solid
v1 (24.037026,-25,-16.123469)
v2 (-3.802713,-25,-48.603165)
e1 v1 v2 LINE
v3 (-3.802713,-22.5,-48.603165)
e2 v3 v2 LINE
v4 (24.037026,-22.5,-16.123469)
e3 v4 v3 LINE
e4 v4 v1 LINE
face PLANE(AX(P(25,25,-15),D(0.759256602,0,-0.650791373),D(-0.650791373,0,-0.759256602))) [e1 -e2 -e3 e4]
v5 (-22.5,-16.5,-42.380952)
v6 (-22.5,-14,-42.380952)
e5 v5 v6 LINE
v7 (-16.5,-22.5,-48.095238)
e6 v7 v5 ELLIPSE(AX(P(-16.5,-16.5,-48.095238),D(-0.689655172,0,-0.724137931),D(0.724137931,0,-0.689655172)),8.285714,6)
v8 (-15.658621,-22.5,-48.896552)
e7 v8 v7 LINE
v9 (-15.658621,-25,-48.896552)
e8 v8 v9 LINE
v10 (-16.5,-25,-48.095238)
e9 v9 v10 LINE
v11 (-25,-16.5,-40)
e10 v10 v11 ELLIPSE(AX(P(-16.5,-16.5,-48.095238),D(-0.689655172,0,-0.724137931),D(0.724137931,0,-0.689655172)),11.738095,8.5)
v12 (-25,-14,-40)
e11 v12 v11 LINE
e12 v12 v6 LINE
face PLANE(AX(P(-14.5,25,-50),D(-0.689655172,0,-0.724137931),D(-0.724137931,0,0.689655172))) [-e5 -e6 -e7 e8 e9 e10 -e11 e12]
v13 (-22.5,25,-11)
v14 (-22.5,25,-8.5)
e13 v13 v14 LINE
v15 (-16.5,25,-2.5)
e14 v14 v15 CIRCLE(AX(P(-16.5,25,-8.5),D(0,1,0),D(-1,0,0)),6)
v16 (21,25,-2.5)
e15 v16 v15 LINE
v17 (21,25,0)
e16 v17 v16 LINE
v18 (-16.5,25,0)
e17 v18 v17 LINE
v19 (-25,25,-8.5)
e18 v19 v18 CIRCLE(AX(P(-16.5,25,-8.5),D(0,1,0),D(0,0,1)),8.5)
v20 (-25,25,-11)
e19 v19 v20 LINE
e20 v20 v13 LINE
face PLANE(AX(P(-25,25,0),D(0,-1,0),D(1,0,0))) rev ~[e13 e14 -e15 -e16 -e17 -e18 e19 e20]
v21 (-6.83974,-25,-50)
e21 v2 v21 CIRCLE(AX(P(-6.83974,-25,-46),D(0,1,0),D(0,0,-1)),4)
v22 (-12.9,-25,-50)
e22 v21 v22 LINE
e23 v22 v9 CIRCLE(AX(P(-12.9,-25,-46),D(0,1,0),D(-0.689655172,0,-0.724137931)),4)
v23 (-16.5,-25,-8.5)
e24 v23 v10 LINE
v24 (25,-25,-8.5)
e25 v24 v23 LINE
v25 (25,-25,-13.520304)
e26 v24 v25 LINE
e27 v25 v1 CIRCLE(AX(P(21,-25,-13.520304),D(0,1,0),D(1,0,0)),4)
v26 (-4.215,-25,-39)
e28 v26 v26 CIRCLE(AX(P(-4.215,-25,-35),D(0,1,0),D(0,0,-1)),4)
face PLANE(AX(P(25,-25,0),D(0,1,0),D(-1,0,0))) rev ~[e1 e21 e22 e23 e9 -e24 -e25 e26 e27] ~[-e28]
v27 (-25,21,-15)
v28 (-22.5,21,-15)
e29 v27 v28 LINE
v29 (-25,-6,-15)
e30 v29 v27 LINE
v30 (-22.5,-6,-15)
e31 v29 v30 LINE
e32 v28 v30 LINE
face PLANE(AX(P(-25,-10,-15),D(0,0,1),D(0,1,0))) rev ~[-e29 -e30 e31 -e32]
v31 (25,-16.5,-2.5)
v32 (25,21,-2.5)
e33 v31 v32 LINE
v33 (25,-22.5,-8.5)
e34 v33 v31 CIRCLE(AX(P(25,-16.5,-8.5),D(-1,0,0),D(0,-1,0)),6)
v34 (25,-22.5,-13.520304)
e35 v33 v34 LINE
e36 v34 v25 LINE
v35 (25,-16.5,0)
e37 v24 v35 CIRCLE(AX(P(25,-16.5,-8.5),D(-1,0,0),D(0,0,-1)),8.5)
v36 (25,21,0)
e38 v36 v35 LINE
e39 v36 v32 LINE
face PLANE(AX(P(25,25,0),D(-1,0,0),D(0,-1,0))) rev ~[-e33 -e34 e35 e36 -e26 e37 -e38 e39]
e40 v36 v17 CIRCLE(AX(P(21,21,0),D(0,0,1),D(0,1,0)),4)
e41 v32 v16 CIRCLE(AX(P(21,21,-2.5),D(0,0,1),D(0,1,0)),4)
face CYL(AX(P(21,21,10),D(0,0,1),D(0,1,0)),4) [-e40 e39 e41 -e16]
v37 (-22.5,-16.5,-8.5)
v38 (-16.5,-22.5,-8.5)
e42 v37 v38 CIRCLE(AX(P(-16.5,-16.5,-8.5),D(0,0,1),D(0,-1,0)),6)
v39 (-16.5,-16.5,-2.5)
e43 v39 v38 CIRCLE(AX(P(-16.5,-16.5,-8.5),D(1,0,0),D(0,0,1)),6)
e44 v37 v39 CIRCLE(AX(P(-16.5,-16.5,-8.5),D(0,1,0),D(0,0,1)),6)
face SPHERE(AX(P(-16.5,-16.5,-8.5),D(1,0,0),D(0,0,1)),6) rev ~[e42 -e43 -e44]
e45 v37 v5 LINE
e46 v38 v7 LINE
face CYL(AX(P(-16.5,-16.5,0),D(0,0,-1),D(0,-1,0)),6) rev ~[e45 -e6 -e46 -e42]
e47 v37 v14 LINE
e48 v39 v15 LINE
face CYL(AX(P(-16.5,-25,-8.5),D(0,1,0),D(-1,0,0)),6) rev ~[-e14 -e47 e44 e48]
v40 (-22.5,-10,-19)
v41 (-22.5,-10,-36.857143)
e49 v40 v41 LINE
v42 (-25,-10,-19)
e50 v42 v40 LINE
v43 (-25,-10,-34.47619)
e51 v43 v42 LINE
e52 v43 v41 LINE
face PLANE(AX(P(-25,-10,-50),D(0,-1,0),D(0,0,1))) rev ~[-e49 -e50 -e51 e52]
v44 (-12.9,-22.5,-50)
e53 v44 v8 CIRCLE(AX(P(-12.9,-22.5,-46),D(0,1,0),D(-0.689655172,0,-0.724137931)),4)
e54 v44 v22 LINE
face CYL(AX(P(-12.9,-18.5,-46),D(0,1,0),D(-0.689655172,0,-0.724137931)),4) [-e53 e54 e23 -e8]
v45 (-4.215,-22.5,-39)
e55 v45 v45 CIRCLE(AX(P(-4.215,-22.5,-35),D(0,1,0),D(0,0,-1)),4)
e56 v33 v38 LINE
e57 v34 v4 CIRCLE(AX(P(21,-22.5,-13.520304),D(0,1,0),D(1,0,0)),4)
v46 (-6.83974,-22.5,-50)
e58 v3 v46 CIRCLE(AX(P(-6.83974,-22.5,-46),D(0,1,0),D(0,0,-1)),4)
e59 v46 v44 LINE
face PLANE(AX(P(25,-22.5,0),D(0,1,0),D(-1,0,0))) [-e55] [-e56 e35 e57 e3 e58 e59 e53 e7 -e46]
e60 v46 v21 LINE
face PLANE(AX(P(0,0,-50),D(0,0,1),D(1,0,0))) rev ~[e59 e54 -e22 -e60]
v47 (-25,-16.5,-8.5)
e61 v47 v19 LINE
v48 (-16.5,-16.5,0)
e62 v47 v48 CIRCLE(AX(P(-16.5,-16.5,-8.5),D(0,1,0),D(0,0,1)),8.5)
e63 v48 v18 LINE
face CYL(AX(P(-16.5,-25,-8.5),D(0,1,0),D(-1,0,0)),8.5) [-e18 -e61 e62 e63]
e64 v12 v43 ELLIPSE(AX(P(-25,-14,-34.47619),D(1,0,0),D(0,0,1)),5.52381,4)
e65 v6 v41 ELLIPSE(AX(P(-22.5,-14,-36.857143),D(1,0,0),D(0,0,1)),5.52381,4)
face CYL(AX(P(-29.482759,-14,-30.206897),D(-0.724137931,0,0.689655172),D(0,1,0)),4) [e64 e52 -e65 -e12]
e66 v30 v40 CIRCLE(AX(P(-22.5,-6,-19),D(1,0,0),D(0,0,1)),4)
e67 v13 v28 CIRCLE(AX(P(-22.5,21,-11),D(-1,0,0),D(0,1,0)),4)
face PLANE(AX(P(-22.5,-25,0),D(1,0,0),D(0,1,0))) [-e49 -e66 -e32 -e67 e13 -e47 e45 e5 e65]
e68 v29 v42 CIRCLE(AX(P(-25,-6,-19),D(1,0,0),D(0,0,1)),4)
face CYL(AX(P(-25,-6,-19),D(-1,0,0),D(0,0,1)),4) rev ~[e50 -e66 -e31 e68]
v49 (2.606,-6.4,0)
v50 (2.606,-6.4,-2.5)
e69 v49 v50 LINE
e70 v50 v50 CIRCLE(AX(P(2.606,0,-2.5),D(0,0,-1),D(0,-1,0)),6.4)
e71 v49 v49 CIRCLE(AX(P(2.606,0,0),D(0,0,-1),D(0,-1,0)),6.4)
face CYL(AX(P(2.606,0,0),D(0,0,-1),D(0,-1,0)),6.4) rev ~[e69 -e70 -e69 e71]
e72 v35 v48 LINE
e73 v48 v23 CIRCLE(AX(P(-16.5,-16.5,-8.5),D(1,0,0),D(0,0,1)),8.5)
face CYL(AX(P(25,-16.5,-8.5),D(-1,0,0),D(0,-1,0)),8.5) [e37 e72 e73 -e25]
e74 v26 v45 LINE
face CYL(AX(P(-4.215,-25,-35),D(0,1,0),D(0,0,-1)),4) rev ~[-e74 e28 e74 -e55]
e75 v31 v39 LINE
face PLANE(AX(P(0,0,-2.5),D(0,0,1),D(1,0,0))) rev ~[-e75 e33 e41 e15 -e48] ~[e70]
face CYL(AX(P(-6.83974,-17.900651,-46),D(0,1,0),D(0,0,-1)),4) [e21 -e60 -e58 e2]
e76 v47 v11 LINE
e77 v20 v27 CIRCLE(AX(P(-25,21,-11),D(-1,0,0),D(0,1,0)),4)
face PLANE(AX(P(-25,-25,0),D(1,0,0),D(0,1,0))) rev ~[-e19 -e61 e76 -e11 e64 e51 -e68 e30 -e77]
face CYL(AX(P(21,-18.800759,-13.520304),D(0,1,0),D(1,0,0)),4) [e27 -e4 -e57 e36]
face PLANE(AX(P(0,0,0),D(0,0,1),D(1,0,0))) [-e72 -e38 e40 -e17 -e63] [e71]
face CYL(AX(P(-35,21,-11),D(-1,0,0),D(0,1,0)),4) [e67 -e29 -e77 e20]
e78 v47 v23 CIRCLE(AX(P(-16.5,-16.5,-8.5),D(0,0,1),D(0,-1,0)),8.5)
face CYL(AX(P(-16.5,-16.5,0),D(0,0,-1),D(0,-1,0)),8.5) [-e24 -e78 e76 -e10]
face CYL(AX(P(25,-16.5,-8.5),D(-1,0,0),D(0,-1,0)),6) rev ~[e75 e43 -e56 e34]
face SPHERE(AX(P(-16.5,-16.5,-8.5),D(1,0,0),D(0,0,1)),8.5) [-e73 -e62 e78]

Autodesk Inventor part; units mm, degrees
ref_plane "YZ Plane" through (0, 0, 0) normal (1, 0, 0) x (0, 1, 0)
ref_plane "XZ Plane" through (0, 0, 0) normal (0, 1, 0) x (-1, 0, 0)
ref_plane "XY Plane" through (0, 0, 0) normal (0, 0, 1) x (1, 0, 0)
sketch "Sketch1" plane through (0, 0, 0) normal (0, 0, 1) x (1, 0, 0)
  line L0 (-25, 25) -> (25, 25)
  line L1 (25, 25) -> (25, -25)
  line L2 (25, -25) -> (-25, -25)
  line L3 (-25, -25) -> (-25, 25)
  point P0 (0, 0)
  dimension "d0" = 50
  dimension "d1" = 50
  dimension "d2" = 25
  dimension "d3" = 25
extrude "Extrusion1" add sketch "Sketch1" against normal blind 50
fillet "Fillet1" radius 8.5 3 edges at (0, -25, 0) (-25, 0, 0) (-25, -25, -25)
shell "Shell1" thickness 2.5 removed faces 3 at (-8.3333, 11.1667, -50) at (-8.3333, 25, -36.1667) at (25, 11.1667, -16.6667)
sketch "Sketch2" plane through (-25, -16.5, -8.5) normal (-1, 0, 0) x (0, 0, 1)
  line L0 (0, 41.5) -> (-41.5, 41.5) projected
  line L1 (-41.5, 41.5) -> (-41.5, 0) projected
  line L2 (-41.5, 6.5) -> (-6.5, 6.5)
  line L3 (-6.5, 6.5) -> (-6.5, 41.5)
  line L4 (-6.5, 41.5) -> (-41.5, 41.5)
  line L5 (-41.5, 41.5) -> (-41.5, 6.5)
  point P0 (8.5, 16.5)
  dimension "d8" = 35
  dimension "d9" = 35
extrude "Extrusion2" cut sketch "Sketch2" against normal through all
sketch "Sketch3" plane through (-16.5, 25, 0) normal (0, 1, 0) x (1, 0, 0)
  line L0 (41.5, 0) -> (41.5, 2.5) projected
  line L1 (41.5, 15) -> (11.5, 50)
  line L2 (0, 50) -> (41.5, 50) projected
  line L3 (41.5, 50) -> (11.5, 50)
  line L4 (41.5, 50) -> (41.5, 15)
  point P0 (41.5, 33)
  point P1 (41.5, 8.5)
  point P2 (16.5, 0)
  point P3 (33, 50)
  point P4 (39, 50)
  dimension "d36" = 30
  dimension "d37" = 35
extrude "Extrusion3" cut sketch "Sketch3" against normal through all
sketch "Sketch4" plane through (0, 0, 0) normal (0, 0, 1) x (1, 0, 0)
  line L0 (-5, -25) -> (25, -25) projected
  line L1 (-16.5, -25) -> (25, -25) projected
  line L2 (-16.5, -25) -> (-5, -25) projected
  line L3 (-25, 25) -> (-25, -10) projected
  line L4 (-25, 25) -> (-25, -16.5) projected
  line L5 (-25, -10) -> (-25, -16.5) projected
  point P0 (0, 0)
  point P1 (2.606, 0)
  dimension "d17" = 27.606
  dimension "d18" = 25
hole "Hole1" at (2.606, 0, 0) direction (0, 0, -1) diameter 12.8 end through all
sketch "Sketch5" plane through (-16.5, -25, -8.5) normal (0, -1, 0) x (1, 0, 0)
  line L0 (12.706, 8.5) -> (25.506, 8.5) projected
  line L1 (0, 8.5) -> (41.5, 8.5) projected
  line L2 (41.5, 8.5) -> (0, 8.5) projected
  line L3 (-8.5, -6.5) -> (-8.5, -41.5) projected
  point P0 (16.5, 8.5)
  point P1 (12.285, -26.5)
  dimension "d43" = 20.785
  dimension "d44" = 35
hole "Hole2" at (-4.215, -25, -35) direction (0, 1, 0) diameter 8 end through all
sketch "Sketch6" plane through (-16.5, 25, 0) normal (0, 1, 0) x (1, 0, 0)
  arc A0 (-8.5, 8.5) -> (0, 0) centre (0, 8.5) ccw projected
  line L0 (0, 50) -> (11.5, 50) projected
  line L1 (-8.5, 15) -> (-8.5, 50) projected
  line L2 (2, 50) -> (-8.5, 40)
  line L3 (-8.5, 40) -> (-8.5, 50)
  line L4 (-8.5, 50) -> (2, 50)
  point P0 (16.5, 0)
  point P1 (9.6603, 50)
  point P2 (-8.5, 19)
  point P3 (-8.5, 46)
  dimension "d38" = 2
  dimension "d39" = 40
extrude "Extrusion4" cut sketch "Sketch6" against normal through all
fillet "Fillet3" radius 4 7 edges at (-23.75, 25, -15) (-23.75, -10, -41.1905) (-14.5, -23.75, -50) (-5, -23.75, -50) (25, -23.75, -15) (25, 25, -1.25) (-23.75, -10, -15)
equation "\"d0\" = d1"
equation "\"d2\" = 0.5 * d1"
equation "\"d3\" = 0.5 * d0"
properties part number "314-06" material "Steel"
